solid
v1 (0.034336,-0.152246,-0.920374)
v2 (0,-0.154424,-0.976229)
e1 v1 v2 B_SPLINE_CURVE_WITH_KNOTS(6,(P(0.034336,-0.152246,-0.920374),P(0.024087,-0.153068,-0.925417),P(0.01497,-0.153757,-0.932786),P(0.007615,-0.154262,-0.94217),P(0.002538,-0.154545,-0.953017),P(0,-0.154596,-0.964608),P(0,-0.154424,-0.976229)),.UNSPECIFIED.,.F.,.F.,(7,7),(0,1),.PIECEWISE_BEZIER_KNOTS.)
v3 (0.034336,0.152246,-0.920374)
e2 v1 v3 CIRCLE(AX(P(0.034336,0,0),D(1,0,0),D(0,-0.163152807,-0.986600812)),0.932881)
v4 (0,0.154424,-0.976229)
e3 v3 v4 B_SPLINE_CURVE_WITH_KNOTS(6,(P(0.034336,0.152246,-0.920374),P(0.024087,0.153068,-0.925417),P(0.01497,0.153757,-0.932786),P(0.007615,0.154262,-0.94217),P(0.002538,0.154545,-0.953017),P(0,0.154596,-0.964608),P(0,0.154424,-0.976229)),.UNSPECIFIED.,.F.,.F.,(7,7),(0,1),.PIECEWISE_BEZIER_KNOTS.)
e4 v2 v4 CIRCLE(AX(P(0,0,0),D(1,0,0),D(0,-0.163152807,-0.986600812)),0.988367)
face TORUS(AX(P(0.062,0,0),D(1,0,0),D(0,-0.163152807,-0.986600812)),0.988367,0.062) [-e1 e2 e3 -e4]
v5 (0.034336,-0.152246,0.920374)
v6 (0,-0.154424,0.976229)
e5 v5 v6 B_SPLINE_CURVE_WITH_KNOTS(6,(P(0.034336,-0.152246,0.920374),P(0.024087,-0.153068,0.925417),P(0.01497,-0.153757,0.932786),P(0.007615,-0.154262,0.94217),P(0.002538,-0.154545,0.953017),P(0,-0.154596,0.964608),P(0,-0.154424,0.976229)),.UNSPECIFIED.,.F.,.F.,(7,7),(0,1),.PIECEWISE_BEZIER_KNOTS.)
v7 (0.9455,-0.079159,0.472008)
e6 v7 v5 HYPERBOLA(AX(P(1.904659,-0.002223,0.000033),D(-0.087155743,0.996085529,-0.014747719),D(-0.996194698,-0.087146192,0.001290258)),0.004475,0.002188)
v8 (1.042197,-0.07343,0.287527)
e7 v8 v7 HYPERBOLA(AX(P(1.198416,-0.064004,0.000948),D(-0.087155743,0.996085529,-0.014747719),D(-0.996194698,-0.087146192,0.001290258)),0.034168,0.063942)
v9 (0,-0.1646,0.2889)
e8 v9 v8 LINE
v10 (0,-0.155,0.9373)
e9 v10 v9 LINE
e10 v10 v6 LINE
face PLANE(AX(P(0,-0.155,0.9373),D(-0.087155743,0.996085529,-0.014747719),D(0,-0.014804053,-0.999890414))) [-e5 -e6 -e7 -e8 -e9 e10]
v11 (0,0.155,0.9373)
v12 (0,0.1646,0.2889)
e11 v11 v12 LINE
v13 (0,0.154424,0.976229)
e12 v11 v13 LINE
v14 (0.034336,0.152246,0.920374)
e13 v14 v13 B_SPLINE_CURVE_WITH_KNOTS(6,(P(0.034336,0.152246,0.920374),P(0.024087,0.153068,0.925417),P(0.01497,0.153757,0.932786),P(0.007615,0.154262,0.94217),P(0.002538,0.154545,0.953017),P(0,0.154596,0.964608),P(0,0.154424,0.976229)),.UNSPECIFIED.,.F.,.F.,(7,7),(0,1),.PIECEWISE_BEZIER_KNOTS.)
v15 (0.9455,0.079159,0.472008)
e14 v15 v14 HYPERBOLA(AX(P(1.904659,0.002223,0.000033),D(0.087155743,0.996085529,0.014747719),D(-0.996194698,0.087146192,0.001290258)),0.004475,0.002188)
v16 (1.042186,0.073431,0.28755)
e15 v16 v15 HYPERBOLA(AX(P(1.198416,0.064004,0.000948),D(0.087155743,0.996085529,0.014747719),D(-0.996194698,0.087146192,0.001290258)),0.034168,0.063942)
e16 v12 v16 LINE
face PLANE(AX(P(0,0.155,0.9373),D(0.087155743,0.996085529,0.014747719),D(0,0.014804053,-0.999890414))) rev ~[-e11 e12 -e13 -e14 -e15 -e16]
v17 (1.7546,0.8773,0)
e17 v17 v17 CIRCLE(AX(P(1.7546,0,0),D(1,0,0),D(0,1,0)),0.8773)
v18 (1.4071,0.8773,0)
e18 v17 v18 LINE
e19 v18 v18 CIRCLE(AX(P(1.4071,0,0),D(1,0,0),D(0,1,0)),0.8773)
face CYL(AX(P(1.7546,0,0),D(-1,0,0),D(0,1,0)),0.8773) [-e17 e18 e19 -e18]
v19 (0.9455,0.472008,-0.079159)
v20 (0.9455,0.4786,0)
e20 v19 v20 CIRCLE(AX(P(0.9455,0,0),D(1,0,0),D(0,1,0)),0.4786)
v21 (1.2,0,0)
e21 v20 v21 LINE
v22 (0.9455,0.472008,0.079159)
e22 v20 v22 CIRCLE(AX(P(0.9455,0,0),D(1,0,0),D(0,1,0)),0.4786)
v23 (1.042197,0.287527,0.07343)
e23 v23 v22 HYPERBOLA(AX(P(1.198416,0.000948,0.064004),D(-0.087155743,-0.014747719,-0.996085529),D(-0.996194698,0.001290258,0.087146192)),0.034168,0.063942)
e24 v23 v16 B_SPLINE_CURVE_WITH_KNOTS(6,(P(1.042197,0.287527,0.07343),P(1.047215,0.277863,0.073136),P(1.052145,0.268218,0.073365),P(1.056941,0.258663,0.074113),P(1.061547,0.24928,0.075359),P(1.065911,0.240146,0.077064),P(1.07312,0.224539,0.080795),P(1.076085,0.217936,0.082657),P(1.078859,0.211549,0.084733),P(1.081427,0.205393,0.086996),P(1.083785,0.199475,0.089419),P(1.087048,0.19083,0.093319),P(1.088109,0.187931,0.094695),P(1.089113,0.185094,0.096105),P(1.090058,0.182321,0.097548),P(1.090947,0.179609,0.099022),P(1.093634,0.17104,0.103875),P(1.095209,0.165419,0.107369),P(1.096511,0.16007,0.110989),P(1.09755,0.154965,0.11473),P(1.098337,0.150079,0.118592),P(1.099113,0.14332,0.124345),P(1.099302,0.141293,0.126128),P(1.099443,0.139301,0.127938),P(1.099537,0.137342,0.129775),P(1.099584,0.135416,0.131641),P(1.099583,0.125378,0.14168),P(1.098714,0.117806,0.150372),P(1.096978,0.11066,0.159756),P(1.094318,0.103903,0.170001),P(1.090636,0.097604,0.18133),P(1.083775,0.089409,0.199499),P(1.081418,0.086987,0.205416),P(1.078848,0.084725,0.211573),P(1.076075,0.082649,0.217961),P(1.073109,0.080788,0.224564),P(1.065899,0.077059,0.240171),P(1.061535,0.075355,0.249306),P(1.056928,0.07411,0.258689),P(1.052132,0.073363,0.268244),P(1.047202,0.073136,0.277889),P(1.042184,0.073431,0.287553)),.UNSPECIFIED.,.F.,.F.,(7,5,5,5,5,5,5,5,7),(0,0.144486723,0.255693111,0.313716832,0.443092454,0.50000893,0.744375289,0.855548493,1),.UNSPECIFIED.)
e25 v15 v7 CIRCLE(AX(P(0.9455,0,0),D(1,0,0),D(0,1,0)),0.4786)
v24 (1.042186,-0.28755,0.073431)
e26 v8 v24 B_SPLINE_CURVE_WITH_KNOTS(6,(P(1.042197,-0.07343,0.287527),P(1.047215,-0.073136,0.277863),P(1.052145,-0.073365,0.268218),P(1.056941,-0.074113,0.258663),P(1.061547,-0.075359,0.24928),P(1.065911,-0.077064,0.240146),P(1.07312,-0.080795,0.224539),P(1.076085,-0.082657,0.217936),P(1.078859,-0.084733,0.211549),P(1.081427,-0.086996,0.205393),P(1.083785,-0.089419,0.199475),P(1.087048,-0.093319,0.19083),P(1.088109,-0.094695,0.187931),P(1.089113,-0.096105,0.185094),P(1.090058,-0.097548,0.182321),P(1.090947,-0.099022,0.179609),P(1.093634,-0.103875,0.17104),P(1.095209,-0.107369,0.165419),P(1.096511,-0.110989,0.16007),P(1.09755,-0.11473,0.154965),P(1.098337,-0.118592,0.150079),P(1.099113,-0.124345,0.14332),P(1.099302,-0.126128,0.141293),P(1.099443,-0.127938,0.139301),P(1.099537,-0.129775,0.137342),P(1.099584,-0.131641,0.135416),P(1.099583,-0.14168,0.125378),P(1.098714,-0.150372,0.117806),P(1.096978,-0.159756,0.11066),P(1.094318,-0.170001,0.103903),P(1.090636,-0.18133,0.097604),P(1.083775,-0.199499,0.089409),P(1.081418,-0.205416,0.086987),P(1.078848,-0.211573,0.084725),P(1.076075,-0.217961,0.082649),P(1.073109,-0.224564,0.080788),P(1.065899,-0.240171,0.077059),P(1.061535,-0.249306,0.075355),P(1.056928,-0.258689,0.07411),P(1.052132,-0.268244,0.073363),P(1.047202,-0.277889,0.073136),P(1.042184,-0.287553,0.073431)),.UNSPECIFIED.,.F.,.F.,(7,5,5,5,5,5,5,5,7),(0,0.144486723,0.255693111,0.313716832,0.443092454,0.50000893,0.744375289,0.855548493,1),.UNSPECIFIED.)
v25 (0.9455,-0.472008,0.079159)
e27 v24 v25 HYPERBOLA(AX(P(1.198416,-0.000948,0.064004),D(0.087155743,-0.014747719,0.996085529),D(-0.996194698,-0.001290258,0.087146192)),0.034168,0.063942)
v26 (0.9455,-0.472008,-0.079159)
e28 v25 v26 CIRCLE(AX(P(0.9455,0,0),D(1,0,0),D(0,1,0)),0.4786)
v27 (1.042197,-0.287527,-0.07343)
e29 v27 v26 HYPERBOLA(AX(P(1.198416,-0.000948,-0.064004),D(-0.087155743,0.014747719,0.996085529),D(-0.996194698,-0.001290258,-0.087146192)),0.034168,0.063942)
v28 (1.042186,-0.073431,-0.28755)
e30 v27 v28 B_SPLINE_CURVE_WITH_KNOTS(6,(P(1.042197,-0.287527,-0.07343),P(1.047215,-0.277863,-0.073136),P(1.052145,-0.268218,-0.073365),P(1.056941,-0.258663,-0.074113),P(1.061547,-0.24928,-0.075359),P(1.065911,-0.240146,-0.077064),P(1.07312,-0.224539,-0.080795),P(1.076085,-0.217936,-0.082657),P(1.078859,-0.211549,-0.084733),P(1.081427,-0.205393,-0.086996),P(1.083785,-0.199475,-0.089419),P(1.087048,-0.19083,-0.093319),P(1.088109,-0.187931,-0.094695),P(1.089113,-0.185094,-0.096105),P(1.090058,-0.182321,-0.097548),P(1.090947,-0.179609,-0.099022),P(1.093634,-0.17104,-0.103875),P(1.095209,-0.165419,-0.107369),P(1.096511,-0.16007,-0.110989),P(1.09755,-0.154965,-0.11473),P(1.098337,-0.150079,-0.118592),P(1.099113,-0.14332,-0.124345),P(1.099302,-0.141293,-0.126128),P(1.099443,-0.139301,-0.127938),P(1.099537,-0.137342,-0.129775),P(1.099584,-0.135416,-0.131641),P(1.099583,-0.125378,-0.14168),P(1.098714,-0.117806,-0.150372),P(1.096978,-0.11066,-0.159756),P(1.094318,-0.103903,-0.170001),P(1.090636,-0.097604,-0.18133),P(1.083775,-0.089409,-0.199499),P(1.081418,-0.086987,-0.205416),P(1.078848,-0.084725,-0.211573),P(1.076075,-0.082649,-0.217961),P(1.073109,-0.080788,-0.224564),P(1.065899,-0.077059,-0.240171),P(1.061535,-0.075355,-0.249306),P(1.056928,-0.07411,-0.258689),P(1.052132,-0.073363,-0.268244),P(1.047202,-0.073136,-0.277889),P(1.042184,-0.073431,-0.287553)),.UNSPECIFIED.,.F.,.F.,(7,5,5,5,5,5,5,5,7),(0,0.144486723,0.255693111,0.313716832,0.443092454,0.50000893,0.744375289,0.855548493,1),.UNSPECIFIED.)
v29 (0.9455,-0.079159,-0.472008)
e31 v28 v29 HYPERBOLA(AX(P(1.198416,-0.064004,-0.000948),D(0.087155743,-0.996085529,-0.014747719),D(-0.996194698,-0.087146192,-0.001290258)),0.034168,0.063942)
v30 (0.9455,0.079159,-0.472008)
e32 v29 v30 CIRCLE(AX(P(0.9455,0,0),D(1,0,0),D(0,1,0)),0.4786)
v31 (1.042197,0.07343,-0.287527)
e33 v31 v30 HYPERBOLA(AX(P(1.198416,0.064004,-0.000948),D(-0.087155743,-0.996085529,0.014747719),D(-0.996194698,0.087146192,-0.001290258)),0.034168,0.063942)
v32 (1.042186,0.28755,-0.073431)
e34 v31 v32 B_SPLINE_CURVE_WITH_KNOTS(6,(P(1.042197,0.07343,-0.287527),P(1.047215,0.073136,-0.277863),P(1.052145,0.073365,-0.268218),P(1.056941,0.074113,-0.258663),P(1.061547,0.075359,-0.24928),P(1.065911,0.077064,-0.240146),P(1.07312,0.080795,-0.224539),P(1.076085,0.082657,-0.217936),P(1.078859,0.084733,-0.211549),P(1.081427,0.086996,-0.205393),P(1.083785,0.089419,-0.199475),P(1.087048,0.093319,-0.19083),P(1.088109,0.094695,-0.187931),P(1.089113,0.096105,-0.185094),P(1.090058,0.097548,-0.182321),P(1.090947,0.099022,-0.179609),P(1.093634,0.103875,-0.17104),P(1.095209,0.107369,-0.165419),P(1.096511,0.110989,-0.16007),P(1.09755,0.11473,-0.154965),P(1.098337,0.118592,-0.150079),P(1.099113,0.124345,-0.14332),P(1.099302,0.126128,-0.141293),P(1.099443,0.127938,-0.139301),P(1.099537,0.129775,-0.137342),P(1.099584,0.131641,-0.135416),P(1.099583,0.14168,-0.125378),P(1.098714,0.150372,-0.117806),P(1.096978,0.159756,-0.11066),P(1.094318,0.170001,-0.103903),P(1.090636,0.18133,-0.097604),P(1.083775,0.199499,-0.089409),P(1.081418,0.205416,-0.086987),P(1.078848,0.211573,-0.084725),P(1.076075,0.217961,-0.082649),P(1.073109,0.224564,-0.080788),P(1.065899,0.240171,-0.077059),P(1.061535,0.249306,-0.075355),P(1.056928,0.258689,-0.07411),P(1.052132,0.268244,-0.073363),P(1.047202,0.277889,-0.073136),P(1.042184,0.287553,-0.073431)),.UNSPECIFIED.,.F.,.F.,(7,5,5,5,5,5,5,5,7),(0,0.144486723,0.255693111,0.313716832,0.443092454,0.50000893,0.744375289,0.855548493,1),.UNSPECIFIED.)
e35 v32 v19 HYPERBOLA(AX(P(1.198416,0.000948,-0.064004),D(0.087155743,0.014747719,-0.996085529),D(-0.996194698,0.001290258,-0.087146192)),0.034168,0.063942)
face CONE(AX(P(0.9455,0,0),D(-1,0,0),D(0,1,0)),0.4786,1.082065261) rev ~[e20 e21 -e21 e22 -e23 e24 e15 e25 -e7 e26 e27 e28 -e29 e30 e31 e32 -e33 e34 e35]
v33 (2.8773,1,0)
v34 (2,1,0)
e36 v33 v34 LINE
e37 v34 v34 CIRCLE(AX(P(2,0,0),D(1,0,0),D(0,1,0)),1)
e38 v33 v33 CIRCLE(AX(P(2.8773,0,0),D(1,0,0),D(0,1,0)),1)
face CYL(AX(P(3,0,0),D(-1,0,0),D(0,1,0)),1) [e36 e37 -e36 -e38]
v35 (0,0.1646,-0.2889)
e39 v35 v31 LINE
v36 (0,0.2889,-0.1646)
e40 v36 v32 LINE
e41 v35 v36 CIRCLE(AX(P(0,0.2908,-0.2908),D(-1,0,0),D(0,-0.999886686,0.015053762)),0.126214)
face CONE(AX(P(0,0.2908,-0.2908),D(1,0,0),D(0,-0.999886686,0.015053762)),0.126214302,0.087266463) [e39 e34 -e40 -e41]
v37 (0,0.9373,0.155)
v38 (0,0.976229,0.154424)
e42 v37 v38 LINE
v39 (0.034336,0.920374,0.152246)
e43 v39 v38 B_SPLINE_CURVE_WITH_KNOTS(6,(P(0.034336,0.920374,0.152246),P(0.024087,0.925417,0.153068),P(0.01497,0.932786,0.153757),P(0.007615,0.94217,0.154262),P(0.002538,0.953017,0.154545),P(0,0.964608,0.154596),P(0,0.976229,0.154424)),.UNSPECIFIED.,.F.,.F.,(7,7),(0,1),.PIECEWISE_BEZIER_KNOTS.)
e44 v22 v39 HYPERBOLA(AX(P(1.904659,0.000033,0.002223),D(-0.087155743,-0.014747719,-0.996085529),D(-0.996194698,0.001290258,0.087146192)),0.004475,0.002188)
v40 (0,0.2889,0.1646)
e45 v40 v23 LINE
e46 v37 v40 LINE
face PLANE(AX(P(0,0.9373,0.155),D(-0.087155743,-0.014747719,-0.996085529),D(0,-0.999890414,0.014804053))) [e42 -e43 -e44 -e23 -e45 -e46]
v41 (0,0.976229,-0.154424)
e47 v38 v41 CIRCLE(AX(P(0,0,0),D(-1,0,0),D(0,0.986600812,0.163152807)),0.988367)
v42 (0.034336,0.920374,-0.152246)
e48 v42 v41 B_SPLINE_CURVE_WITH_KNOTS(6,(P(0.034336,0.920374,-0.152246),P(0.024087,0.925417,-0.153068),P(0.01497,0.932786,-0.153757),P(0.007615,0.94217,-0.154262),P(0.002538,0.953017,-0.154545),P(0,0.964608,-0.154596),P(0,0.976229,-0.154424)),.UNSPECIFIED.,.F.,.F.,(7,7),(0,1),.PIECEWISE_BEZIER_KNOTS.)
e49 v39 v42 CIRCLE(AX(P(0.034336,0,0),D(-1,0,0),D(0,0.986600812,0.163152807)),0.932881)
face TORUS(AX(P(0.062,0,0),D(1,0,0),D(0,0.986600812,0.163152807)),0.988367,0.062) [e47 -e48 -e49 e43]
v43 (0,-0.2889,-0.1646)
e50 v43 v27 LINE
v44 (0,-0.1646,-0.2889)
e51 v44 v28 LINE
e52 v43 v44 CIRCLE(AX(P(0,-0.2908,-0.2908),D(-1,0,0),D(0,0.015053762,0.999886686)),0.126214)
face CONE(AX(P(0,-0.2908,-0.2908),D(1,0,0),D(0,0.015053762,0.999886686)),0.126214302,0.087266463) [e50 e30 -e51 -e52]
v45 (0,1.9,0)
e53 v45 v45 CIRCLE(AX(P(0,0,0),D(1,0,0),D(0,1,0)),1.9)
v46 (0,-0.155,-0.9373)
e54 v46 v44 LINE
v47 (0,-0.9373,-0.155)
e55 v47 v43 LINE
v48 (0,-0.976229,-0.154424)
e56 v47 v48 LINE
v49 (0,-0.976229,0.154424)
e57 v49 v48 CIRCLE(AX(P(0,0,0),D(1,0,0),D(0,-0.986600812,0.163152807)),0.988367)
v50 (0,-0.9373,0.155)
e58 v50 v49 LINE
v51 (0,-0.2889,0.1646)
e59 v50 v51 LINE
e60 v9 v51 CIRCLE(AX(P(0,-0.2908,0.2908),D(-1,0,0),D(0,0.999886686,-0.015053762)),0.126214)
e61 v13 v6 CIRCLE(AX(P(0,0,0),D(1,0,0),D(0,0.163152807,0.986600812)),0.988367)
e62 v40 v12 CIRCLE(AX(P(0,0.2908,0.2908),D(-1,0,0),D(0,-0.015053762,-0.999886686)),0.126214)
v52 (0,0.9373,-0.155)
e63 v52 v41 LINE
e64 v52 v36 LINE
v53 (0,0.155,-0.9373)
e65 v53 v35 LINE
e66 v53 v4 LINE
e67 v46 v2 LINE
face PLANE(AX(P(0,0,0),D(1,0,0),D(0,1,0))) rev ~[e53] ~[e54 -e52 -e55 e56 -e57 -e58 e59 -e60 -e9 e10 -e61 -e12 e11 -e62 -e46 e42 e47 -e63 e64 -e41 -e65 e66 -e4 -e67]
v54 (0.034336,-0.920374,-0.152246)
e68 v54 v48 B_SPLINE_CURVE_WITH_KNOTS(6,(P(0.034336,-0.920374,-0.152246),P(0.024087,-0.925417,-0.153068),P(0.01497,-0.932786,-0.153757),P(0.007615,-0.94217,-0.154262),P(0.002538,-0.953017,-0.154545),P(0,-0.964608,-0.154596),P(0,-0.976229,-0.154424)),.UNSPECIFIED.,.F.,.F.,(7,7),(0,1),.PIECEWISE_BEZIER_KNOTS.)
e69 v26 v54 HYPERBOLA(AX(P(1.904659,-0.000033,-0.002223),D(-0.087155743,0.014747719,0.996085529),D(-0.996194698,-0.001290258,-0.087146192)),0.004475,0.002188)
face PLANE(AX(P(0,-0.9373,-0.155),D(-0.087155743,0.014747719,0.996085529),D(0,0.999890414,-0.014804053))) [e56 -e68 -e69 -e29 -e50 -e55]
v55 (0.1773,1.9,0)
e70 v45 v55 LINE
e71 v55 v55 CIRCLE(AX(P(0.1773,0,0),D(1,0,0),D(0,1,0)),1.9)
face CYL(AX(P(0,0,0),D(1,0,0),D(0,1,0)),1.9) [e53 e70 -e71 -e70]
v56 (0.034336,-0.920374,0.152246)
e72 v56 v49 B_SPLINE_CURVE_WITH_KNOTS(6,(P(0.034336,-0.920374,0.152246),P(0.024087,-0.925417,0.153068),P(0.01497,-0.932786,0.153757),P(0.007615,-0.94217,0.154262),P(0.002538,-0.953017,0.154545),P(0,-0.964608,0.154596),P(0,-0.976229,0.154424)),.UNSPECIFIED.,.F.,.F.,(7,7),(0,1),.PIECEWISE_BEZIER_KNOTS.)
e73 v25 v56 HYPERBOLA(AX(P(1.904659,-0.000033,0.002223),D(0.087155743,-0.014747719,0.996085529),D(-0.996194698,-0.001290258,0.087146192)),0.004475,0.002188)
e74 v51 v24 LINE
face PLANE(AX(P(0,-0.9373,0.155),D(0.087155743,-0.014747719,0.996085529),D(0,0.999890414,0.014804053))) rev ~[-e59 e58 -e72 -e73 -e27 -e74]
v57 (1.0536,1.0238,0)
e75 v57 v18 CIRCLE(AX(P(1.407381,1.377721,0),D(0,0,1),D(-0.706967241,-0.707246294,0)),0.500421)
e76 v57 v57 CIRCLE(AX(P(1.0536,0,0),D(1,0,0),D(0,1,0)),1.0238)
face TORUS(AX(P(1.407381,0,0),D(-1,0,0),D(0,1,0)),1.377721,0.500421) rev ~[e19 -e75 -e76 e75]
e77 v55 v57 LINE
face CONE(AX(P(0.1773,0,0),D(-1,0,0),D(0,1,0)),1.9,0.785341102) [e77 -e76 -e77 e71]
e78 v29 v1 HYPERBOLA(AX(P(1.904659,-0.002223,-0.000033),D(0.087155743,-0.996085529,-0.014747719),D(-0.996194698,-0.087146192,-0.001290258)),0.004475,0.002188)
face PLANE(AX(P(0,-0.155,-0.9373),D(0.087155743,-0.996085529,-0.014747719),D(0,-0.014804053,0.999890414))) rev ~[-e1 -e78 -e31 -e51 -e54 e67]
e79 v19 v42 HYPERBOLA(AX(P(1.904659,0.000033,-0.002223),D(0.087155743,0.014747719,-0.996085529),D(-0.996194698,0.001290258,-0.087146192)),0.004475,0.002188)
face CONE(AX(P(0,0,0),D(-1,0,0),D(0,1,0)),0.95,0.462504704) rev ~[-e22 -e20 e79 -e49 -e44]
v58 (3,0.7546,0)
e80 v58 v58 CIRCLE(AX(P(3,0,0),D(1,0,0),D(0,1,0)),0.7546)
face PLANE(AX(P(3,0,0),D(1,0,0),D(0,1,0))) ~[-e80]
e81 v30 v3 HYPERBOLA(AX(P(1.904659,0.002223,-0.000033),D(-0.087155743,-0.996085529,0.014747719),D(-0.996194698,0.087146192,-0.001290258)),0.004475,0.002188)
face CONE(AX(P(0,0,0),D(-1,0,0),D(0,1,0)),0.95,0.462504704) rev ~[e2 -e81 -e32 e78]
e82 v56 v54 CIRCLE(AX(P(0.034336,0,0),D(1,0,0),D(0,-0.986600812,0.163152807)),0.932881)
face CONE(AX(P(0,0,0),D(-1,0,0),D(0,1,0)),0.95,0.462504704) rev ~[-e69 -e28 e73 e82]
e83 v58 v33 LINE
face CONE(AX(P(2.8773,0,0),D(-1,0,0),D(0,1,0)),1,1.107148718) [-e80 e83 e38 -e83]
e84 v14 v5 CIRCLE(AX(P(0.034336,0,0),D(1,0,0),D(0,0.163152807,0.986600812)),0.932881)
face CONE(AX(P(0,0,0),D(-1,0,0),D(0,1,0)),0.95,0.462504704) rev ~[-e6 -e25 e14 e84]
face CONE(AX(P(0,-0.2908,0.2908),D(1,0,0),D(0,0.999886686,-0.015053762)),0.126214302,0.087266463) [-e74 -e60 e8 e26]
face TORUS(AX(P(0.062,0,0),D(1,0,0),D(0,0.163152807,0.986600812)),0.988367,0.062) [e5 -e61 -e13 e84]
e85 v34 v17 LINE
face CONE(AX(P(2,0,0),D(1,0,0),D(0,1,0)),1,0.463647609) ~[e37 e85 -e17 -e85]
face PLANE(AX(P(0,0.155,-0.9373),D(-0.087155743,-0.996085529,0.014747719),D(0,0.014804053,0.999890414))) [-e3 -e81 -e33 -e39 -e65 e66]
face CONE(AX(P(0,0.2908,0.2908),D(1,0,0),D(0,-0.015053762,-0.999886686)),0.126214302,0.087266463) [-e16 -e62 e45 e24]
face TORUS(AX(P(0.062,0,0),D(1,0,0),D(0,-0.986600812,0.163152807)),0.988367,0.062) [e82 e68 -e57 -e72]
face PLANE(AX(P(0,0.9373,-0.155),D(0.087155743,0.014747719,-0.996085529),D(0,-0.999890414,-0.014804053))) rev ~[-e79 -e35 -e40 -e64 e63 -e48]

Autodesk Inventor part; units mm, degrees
ref_plane "YZ Plane" through (0, 0, 0) normal (1, 0, 0) x (0, 1, 0)
ref_plane "XZ Plane" through (0, 0, 0) normal (0, 1, 0) x (-1, 0, 0)
sketch "Sketch1" plane through (0, 0, 0) normal (0, 0, 1) x (1, 0, 0)
  line L0 (1.2, 0) -> (3, 0)
  line L1 (3, 0) -> (3, 1)
  line L2 (3, 1) -> (2, 1)
  line L3 (2, 1) -> (1.7546, 0.8773)
  line L4 (1.7546, 0.8773) -> (1.4071, 0.8773)
  line L5 (0, 1.9) -> (0, 0.95)
  line L6 (0, 0.95) -> (0.9455, 0.4786)
  line L7 (0.9455, 0.4786) -> (1.2, 0)
  line L8 (-0.6, 0) -> (3.6, 0) projected
  line L9 (0, -0.38) -> (0, 2.28) projected
  line L10 (0, 1.9) -> (0.1773, 1.9)
  line L11 (0.1773, 1.9) -> (1.0536, 1.0238)
  line L12 (2, 1) -> (1.0773, 1) construction
  arc A0 (1.0536, 1.0238) -> (1.4071, 0.8773) centre (1.4071, 1.3773) ccw
  point P0 (1.2, 0.8773)
  dimension "d1" = 1
  dimension "d2" = 2
  dimension "d3" = 1.7546
  dimension "d4" = 1.9
  dimension "d5" = 26.5
  dimension "d6" = 62
  dimension "d7" = 1.2
  dimension "d8" = 0.2454
  dimension "d12" = 3.8
  dimension "d13" = 45
  dimension "d15" = 3
  dimension "d24" = 1.2
  dimension "d93" = 0.5
revolve "Body" add sketch "Sketch1" angle 360 about axis through (1.2, 0, 0) along (1, 0, 0) contours L7 L6 L5 L10 L11 A0 L4 L3 L2 L1 L0
sketch "Sketch2" plane through (0, 0, 0) normal (-1, 0, 0) x (0, 0, 1)
  line L0 (0, 0.95) -> (0, 0) construction
  line L1 (0, 0) -> (0.95, 0) construction
  arc A0 (0.285, 0) -> (0, 0.285) centre (0, 0) ccw construction
  arc A1 (0.3325, 0) -> (0, 0.3325) centre (0, 0) ccw construction
  arc A2 (0.9373, 0.155) -> (0.155, 0.9373) centre (0, 0) ccw
  line L2 (0, 0) -> (0.6718, 0.6718) construction
  line L3 (0.155, 0.9373) -> (0.1646, 0.2889)
  line L4 (0.9373, 0.155) -> (0.2889, 0.1646)
  arc A3 (0.155, 0.9373) -> (0, 0.95) centre (0, 0) ccw
  arc A4 (0.95, 0) -> (0.9373, 0.155) centre (0, 0) ccw
  line L5 (0, -2.66) -> (0, 2.66) projected
  line L6 (-2.66, 0) -> (2.66, 0) projected
  arc A5 (0.155, -0.9373) -> (0.9373, -0.155) centre (0, 0) ccw
  line L7 (0.155, -0.9373) -> (0.1646, -0.2889)
  line L8 (0.9373, -0.155) -> (0.2889, -0.1646)
  arc A6 (0, -0.95) -> (0.155, -0.9373) centre (0, 0) ccw
  arc A7 (0.9373, -0.155) -> (0.95, 0) centre (0, 0) ccw
  arc A8 (-0.155, 0.9373) -> (-0.9373, 0.155) centre (0, 0) ccw
  line L9 (-0.155, 0.9373) -> (-0.1646, 0.2889)
  line L10 (-0.9373, 0.155) -> (-0.2889, 0.1646)
  arc A9 (0, 0.95) -> (-0.155, 0.9373) centre (0, 0) ccw
  arc A10 (-0.9373, 0.155) -> (-0.95, 0) centre (0, 0) ccw
  arc A11 (-0.155, -0.9373) -> (0, -0.95) centre (0, 0) ccw
  arc A12 (-0.9373, -0.155) -> (-0.155, -0.9373) centre (0, 0) ccw
  arc A13 (-0.95, 0) -> (-0.9373, -0.155) centre (0, 0) ccw
  line L11 (-0.9373, -0.155) -> (-0.2889, -0.1646)
  line L12 (-0.155, -0.9373) -> (-0.1646, -0.2889)
  arc A14 (0.1646, 0.2889) -> (0.2889, 0.1646) centre (0.2908, 0.2908) ccw
  arc A15 (0.2889, -0.1646) -> (0.1646, -0.2889) centre (0.2908, -0.2908) ccw
  arc A16 (-0.2889, 0.1646) -> (-0.1646, 0.2889) centre (-0.2908, 0.2908) ccw
  arc A17 (-0.1646, -0.2889) -> (-0.2889, -0.1646) centre (-0.2908, -0.2908) ccw
  point P0 (0.6718, -0.6718)
  point P1 (-0.6718, 0.6718)
  point P2 (-0.6718, -0.6718)
  dimension "d17" = 0.57
  dimension "d18" = 0.665
  dimension "d19" = 1.9
  dimension "d20" = 45
  dimension "d21" = 0.155
extrude "Slot" add sketch "Sketch2" against normal up to next draft 5 contours L4 A14 L3 A2 | A5 L7 A15 L8 | L9 A16 L10 A8 | A12 L11 A17 L12
fillet "Fillet1" radius 0.062 4 edges at (0, 0.95, 0) (0, 0, -0.95) (0, -0.95, 0) (0, 0, 0.95)
thread "Thread" size "M2x0.4" class "6g" standard "ISO Metric profile" length 1
chamfer "Chamfer1" distance 0.2454 distance2 0.1227 1 edges at (3, -1, 0) measured on face at (3, 0.479, -0.3842)
ref_plane "Work Plane2" through (3.35, 0, 0) normal (0, 0, -1) x (1, 0, 0)
equation "\"d1\" = GEL"
equation "\"d2\" = GD"
equation "\"d3\" = BDM"
equation "\"d4\" = SDM"
equation "\"d7\" = INTI"
equation "\"d8\" = GAL"
equation "\"d12\" = KOD"
equation "\"d13\" = 0.5 * SEWI"
equation "\"d15\" = NLG"
equation "\"d24\" = KOH"
equation "\"d93\" = R"
equation "\"d17\" = 0.3 * SDM"
equation "\"d18\" = 0.35 * SDM"
equation "\"d19\" = SDM"
equation "\"d21\" = 0.5 * SBR"
equation "\"d23\" = 0.2 * SBR"
equation "\"d10\" = GEL"
equation "\"d25\" = -0.5 * SPD + 0.5 * GD"
equation "\"d26\" = 0.5 * GAL"
equation "\"NLG\" = 3"
equation "\"GEL\" = 1"
equation "\"GAL\" = 0.61345 * PTC"
equation "\"SPD\" = NND - 1.2269 * PTC"
equation "\"KOD\" = 3.8"
equation "\"KOH\" = 1.2"
equation "\"SBR\" = 0.31"
equation "\"INTI\" = 1.2"
equation "\"SDM\" = 1.9"
equation "\"GD\" = NND"
equation "\"BDM\" = NND - GAL"
equation "\"SEWI\" = 90deg"
equation "\"d9\" = SDM"
equation "\"R\" = 0.5"
equation "\"GUL\" = 0.61345 * PTC"
equation "\"TOA\" = 30deg"
equation "\"EPV\" = 2.2"
equation "\"THREADDIA\" = 2"
equation "\"PTC\" = 0.4"
equation "\"NND\" = 2"
equation "\"GD1\" = THREADDIA - 1.2269 * PTC"
properties part number "ISO 7046-1  - M2 x 3 - 4.8 - H" material "Steel"
